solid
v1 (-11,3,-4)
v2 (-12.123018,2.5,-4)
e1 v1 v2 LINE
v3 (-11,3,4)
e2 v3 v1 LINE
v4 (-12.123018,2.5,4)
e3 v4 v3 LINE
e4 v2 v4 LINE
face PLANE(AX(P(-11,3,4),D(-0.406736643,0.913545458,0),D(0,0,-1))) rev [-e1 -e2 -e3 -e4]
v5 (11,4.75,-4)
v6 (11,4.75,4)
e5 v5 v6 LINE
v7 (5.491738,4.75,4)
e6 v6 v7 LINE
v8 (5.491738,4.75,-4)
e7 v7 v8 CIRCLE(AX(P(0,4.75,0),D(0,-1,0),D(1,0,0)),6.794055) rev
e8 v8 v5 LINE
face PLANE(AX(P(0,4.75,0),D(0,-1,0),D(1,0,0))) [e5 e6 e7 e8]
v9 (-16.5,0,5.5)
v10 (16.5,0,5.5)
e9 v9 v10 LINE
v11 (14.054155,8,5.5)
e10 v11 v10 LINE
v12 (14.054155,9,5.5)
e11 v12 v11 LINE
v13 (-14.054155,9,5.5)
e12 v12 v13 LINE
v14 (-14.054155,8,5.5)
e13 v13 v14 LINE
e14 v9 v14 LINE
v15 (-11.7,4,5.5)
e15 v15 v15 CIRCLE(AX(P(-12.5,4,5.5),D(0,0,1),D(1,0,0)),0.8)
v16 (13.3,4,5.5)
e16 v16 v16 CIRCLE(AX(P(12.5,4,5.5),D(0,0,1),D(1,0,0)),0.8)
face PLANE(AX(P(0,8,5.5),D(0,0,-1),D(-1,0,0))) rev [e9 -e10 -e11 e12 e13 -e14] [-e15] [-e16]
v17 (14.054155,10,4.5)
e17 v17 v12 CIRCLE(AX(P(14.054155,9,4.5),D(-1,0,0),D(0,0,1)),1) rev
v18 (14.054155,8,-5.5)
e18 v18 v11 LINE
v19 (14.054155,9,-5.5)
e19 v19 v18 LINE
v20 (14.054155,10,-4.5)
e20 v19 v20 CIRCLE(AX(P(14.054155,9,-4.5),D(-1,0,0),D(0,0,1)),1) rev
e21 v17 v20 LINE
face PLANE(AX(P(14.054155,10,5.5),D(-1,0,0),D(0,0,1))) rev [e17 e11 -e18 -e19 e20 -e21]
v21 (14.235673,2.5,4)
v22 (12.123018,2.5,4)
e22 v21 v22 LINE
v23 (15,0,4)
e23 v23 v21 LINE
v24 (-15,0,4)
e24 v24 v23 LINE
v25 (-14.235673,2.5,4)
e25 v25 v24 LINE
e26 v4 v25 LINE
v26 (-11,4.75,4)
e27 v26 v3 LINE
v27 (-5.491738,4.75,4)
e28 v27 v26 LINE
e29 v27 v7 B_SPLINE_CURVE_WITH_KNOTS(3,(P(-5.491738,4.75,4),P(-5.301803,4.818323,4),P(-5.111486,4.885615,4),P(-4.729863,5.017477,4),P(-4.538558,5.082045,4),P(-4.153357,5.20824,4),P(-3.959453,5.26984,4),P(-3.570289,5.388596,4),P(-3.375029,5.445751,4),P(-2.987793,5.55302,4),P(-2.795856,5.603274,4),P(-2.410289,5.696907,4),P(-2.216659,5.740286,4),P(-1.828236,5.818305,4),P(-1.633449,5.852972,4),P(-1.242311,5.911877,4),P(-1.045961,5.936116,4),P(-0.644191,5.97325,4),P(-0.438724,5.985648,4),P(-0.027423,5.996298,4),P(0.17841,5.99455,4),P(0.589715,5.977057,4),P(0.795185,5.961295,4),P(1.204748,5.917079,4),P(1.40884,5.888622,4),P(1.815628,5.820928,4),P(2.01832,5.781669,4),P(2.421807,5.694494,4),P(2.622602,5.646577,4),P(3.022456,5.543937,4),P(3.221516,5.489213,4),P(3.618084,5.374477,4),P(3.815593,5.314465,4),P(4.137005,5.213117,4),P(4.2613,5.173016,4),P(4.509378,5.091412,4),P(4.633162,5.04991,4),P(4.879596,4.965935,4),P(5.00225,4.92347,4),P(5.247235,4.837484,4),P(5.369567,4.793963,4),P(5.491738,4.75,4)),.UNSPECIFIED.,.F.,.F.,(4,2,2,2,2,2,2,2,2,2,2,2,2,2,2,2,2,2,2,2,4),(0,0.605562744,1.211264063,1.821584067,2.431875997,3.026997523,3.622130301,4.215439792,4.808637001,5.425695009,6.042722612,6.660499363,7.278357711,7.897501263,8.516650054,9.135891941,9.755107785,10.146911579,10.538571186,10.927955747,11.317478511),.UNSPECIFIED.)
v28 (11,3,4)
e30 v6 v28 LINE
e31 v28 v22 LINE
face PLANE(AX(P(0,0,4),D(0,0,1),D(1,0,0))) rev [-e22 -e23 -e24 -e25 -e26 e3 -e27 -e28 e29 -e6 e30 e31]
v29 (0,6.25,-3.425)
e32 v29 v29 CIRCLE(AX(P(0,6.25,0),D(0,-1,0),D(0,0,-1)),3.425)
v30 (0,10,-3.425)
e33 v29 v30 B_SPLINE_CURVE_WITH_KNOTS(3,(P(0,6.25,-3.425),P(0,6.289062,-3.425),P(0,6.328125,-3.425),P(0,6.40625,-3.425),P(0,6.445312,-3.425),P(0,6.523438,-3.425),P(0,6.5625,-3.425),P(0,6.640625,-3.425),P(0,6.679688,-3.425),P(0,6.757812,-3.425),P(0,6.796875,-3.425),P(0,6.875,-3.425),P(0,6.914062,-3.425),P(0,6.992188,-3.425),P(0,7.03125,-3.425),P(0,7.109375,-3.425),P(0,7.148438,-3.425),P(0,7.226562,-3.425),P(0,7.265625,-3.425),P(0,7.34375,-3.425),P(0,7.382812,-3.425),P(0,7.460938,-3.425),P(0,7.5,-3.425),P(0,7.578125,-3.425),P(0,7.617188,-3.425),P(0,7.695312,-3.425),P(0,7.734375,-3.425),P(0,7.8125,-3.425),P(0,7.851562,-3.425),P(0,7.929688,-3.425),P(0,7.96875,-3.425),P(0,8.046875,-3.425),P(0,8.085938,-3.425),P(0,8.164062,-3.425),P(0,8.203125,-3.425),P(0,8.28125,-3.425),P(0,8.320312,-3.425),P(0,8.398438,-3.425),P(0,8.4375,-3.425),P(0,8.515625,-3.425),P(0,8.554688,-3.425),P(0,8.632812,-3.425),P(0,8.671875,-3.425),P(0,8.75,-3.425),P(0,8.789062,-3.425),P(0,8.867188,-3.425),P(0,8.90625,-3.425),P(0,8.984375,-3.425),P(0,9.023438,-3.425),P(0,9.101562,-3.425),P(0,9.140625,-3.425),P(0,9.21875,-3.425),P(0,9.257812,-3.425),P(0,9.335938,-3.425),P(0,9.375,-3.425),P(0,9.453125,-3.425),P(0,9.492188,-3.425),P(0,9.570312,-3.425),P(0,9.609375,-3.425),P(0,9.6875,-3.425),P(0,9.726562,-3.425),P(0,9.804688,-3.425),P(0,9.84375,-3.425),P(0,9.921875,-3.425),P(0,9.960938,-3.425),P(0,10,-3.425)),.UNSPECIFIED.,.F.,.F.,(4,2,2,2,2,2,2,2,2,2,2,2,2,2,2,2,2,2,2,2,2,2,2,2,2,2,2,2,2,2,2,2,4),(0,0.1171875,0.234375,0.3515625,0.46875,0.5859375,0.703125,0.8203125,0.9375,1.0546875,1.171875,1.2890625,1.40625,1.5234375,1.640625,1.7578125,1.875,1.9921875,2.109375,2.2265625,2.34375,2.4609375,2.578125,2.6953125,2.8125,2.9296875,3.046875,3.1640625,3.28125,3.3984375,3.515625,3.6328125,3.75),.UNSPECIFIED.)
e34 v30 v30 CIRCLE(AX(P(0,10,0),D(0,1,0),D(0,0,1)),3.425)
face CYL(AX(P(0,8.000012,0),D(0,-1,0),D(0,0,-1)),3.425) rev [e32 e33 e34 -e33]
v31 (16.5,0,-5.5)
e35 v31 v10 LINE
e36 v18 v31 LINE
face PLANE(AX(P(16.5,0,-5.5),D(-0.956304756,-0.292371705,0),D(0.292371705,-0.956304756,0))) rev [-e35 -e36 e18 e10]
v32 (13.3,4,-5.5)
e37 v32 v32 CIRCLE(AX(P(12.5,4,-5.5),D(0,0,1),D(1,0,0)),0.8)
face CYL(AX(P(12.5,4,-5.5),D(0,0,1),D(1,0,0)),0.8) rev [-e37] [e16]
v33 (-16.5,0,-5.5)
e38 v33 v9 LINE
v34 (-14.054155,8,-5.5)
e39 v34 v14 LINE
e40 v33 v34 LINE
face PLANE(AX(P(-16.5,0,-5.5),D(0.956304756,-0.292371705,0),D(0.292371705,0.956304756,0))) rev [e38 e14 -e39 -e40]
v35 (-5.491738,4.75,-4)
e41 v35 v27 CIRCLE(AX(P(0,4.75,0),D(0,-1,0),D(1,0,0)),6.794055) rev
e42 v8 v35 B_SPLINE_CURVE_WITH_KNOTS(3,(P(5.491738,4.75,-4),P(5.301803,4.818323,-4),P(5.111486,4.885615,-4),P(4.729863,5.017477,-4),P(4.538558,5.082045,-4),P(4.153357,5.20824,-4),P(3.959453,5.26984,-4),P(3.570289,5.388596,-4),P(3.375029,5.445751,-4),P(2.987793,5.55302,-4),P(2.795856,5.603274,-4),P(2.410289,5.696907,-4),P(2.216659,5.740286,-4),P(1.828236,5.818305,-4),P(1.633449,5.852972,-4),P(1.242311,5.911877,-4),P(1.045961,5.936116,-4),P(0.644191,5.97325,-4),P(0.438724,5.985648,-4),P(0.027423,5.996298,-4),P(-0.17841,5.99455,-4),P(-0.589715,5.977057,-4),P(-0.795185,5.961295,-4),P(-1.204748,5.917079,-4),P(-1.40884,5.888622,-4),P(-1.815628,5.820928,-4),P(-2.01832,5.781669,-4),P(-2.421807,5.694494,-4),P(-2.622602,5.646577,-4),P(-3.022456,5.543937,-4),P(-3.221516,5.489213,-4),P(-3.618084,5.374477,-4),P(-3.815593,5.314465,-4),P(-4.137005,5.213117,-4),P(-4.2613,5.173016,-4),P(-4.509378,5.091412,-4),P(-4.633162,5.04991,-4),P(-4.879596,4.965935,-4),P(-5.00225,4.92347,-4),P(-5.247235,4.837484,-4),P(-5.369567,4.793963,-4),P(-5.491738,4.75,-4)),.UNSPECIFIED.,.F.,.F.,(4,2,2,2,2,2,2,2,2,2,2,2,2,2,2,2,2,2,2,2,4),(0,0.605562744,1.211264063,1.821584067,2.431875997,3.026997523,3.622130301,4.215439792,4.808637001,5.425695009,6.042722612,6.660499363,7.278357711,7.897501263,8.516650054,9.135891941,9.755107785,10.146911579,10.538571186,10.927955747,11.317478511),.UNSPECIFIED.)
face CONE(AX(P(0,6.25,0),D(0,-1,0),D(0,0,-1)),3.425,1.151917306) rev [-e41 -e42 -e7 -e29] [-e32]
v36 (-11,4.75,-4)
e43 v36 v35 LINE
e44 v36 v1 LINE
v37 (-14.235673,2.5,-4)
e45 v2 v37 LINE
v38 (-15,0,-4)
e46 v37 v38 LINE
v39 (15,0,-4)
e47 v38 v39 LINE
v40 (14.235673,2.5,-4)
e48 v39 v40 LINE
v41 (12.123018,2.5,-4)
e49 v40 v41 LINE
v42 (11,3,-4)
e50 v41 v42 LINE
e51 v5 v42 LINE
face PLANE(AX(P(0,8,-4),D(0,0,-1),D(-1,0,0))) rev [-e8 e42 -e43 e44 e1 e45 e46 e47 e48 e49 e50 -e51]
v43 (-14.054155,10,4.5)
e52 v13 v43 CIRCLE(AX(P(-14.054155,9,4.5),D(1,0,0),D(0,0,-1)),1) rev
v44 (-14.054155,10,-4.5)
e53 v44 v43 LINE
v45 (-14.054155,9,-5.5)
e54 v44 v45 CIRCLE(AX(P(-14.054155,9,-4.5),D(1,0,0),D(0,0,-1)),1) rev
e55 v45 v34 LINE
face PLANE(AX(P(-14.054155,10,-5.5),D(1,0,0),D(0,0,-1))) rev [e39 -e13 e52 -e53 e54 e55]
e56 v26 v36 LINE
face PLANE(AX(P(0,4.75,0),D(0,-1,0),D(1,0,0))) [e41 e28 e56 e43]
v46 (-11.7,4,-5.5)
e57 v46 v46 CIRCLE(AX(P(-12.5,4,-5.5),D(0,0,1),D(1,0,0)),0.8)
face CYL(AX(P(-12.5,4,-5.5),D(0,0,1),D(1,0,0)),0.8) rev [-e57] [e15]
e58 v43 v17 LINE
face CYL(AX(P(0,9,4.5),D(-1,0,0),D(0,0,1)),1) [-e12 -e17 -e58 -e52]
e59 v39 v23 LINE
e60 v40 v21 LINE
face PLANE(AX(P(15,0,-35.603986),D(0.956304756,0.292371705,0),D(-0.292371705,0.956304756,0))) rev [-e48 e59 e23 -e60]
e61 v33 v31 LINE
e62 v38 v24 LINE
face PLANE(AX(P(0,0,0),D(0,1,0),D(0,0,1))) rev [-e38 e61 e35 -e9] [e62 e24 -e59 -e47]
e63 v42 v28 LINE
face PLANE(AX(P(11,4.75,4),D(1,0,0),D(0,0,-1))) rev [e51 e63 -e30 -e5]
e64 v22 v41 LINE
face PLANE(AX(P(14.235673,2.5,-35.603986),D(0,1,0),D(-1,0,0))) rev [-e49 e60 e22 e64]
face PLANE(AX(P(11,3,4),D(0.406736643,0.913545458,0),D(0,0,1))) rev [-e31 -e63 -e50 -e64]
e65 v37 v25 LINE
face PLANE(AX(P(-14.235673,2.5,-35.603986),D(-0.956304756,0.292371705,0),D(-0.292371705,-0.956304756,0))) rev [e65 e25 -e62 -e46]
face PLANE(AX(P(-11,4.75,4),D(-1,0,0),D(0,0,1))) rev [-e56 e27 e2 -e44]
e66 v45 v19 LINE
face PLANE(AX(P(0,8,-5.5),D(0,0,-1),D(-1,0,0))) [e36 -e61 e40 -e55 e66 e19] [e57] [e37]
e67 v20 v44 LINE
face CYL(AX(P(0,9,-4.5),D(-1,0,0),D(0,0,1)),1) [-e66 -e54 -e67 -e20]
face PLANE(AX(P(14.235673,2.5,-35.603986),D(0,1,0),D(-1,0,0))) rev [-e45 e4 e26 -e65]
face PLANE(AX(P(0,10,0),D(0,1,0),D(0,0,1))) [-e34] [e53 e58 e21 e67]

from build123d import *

# Parameters (mm, degrees)
SKETCH1_W                      = 33
SKETCH1_H                      = 11
SKETCH1_W_2                    = 30
SKETCH1_H_2                    = 8
BOSS_EXTRUDE1_DEPTH            = 8
SKETCH3_R                      = 0.8
CUT_EXTRUDE3_DEPTH             = 22.38340478
CUT_EXTRUDE5_REACH             = 21.144
SKETCH5_R                      = 3.425
CUT_EXTRUDE5_DIRECTION_2_DEPTH = 20.144189719
CUT_EXTRUDE4_DEPTH             = 22.38340478
CUT_EXTRUDE9_START             = -1.5
CUT_EXTRUDE9_DEPTH             = 8
SKETCH9_W                      = 22
SKETCH9_H                      = 8
CUT_EXTRUDE8_DEPTH             = 2.25
BOSS_EXTRUDE8_START            = 2
SKETCH12_W                     = 28.108309096
SKETCH12_H                     = 11
SKETCH12_R                     = 3.425
BOSS_EXTRUDE8_DEPTH            = 2
FILLET1_R                      = 1
CHAMFER1_SIZE                  = 1.5
CHAMFER1_SIZE_2                = 3.369055161
CHAMFER2_SIZE                  = 0.5
CHAMFER2_SIZE2                 = 1.123018387
CHAMFER3_SIZE                  = 0.5
CHAMFER3_SIZE2                 = 1.123018387


with BuildPart() as part:
    # Sketch1 → Boss-Extrude1 (new body)
    # profile 1 of 2: a face of its own
    with BuildSketch(Plane(origin=(0, 0, 0), x_dir=(1, 0, 0), z_dir=(0, 1, 0))):
        Rectangle(SKETCH1_W, SKETCH1_H)
        Rectangle(SKETCH1_W_2, SKETCH1_H_2, mode=Mode.SUBTRACT)
    # profile 2 of 2: a face of its own
    with BuildSketch(Plane(origin=(0, 0, 0), x_dir=(1, 0, 0), z_dir=(0, 1, 0))):
        Rectangle(SKETCH1_W_2, SKETCH1_H_2)
    extrude(amount=BOSS_EXTRUDE1_DEPTH)

    # Sketch3 → Cut-Extrude3 (cut, through all)
    with BuildSketch(Plane.XY.offset(5.5)):
        with Locations((-12.5, 4)):
            Circle(SKETCH3_R)
        with Locations((12.5, 4)):
            Circle(SKETCH3_R)
    extrude(amount=-CUT_EXTRUDE3_DEPTH, mode=Mode.SUBTRACT)

    # Sketch5 → Cut-Extrude5 (cut, up to next)
    with BuildSketch(Plane(origin=(0, 8, 0), x_dir=(1, 0, 0), z_dir=(0, 1, 0)), mode=Mode.PRIVATE) as cut_extrude5_sk1:
        with Locations(Location((0, 0, 0), (0, 0, 90))):
            Circle(SKETCH5_R)
    cut_extrude5_tool1 = extrude(cut_extrude5_sk1.sketch, amount=-CUT_EXTRUDE5_REACH, mode=Mode.PRIVATE) & part.part
    add(cut_extrude5_tool1.solids().sort_by_distance((0, 8, 0))[0], mode=Mode.SUBTRACT)

    # Sketch5 → Cut-Extrude5 direction 2 (cut)
    with BuildSketch(Plane(origin=(0, 8, 0), x_dir=(1, 0, 0), z_dir=(0, 1, 0))):
        with Locations(Location((0, 0, 0), (0, 0, 90))):
            Circle(SKETCH5_R)
    extrude(amount=CUT_EXTRUDE5_DIRECTION_2_DEPTH, mode=Mode.SUBTRACT)

    # Sketch4 → Cut-Extrude4 (cut, through all)
    with BuildSketch(Plane.XY.offset(5.5)):
        Polygon((-16.5, 0), (-14.054154548, 8), (-16.5, 8), align=None)
        Polygon((16.5, 0), (14.054154548, 8), (16.5, 8), align=None)
    extrude(amount=-CUT_EXTRUDE4_DEPTH, mode=Mode.SUBTRACT)

    # Sketch14 → Cut-Extrude9 (cut)
    with BuildSketch(Plane.XY.offset(5.5).offset(CUT_EXTRUDE9_START)):
        Polygon((-15, 0), (15, 0), (14.235673296, 2.5), (-14.235673296, 2.5), align=None)
    extrude(amount=-CUT_EXTRUDE9_DEPTH, mode=Mode.SUBTRACT)

    # Sketch9 → Cut-Extrude8 (cut)
    with BuildSketch(Plane.XZ.offset(-2.5)):
        Rectangle(SKETCH9_W, SKETCH9_H)
    extrude(amount=-CUT_EXTRUDE8_DEPTH, mode=Mode.SUBTRACT)

    # Sketch12 → Boss-Extrude8 (add)
    with BuildSketch(Plane(origin=(0, 8, 0), x_dir=(1, 0, 0), z_dir=(0, 1, 0)).offset(BOSS_EXTRUDE8_START)):
        Rectangle(SKETCH12_W, SKETCH12_H)
        with Locations(Location((0, 0, 0), (0, 0, 90))):
            Circle(SKETCH12_R, mode=Mode.SUBTRACT)
    extrude(amount=-BOSS_EXTRUDE8_DEPTH)

    # Fillet1
    fillet1_edges = [part.edges().sort_by_distance(p)[0] for p in [
        (0, 10, 5.5),
        (0, 10, -5.5),
    ]]
    fillet(fillet1_edges, radius=FILLET1_R)

    # Chamfer1
    # the kernel refuses this chamfer: 3.369055161, 1.5 mm, written as the material it takes off along each edge
    with BuildSketch(Plane(origin=(0, 4.75, 0), x_dir=(0, 0, -1), z_dir=(1, 0, 0))) as chamfer1_piece_1_section:
        Polygon((3.425, CHAMFER1_SIZE), (3.425 + CHAMFER1_SIZE_2, 0), (3.425, 0), align=None)
    chamfer1_piece_1 = revolve(axis=Axis((0, 4.75, 0), (0, 1, 0)), mode=Mode.PRIVATE)
    chamfer1_piece_1 = split(chamfer1_piece_1, bisect_by=Plane(origin=(-3.367570152, 6.000830153, 4), z_dir=(0, 0, -1)), keep=Keep.TOP, mode=Mode.PRIVATE)
    chamfer1_piece_1 = split(chamfer1_piece_1, bisect_by=Plane(origin=(-3.367570152, 6.000830153, -4), z_dir=(0, 0, 1)), keep=Keep.TOP, mode=Mode.PRIVATE)
    add(chamfer1_piece_1, mode=Mode.SUBTRACT)

    # Chamfer2
    chamfer2_edges = [part.edges().sort_by_distance(p)[0] for p in [
        (-11, 2.5, 0),
    ]]
    chamfer2_side = [part.faces().sort_by_distance(p)[0] for p in [
        (-11, 3.625, 0),
    ]]
    chamfer(chamfer2_edges, length=CHAMFER2_SIZE, length2=CHAMFER2_SIZE2, reference=chamfer2_side[0])

    # Chamfer3
    chamfer3_edges = [part.edges().sort_by_distance(p)[0] for p in [
        (11, 2.5, 0),
    ]]
    chamfer3_side = [part.faces().sort_by_distance(p)[0] for p in [
        (11, 3.625, 0),
    ]]
    chamfer(chamfer3_edges, length=CHAMFER3_SIZE, length2=CHAMFER3_SIZE2, reference=chamfer3_side[0])


solid = part.part
